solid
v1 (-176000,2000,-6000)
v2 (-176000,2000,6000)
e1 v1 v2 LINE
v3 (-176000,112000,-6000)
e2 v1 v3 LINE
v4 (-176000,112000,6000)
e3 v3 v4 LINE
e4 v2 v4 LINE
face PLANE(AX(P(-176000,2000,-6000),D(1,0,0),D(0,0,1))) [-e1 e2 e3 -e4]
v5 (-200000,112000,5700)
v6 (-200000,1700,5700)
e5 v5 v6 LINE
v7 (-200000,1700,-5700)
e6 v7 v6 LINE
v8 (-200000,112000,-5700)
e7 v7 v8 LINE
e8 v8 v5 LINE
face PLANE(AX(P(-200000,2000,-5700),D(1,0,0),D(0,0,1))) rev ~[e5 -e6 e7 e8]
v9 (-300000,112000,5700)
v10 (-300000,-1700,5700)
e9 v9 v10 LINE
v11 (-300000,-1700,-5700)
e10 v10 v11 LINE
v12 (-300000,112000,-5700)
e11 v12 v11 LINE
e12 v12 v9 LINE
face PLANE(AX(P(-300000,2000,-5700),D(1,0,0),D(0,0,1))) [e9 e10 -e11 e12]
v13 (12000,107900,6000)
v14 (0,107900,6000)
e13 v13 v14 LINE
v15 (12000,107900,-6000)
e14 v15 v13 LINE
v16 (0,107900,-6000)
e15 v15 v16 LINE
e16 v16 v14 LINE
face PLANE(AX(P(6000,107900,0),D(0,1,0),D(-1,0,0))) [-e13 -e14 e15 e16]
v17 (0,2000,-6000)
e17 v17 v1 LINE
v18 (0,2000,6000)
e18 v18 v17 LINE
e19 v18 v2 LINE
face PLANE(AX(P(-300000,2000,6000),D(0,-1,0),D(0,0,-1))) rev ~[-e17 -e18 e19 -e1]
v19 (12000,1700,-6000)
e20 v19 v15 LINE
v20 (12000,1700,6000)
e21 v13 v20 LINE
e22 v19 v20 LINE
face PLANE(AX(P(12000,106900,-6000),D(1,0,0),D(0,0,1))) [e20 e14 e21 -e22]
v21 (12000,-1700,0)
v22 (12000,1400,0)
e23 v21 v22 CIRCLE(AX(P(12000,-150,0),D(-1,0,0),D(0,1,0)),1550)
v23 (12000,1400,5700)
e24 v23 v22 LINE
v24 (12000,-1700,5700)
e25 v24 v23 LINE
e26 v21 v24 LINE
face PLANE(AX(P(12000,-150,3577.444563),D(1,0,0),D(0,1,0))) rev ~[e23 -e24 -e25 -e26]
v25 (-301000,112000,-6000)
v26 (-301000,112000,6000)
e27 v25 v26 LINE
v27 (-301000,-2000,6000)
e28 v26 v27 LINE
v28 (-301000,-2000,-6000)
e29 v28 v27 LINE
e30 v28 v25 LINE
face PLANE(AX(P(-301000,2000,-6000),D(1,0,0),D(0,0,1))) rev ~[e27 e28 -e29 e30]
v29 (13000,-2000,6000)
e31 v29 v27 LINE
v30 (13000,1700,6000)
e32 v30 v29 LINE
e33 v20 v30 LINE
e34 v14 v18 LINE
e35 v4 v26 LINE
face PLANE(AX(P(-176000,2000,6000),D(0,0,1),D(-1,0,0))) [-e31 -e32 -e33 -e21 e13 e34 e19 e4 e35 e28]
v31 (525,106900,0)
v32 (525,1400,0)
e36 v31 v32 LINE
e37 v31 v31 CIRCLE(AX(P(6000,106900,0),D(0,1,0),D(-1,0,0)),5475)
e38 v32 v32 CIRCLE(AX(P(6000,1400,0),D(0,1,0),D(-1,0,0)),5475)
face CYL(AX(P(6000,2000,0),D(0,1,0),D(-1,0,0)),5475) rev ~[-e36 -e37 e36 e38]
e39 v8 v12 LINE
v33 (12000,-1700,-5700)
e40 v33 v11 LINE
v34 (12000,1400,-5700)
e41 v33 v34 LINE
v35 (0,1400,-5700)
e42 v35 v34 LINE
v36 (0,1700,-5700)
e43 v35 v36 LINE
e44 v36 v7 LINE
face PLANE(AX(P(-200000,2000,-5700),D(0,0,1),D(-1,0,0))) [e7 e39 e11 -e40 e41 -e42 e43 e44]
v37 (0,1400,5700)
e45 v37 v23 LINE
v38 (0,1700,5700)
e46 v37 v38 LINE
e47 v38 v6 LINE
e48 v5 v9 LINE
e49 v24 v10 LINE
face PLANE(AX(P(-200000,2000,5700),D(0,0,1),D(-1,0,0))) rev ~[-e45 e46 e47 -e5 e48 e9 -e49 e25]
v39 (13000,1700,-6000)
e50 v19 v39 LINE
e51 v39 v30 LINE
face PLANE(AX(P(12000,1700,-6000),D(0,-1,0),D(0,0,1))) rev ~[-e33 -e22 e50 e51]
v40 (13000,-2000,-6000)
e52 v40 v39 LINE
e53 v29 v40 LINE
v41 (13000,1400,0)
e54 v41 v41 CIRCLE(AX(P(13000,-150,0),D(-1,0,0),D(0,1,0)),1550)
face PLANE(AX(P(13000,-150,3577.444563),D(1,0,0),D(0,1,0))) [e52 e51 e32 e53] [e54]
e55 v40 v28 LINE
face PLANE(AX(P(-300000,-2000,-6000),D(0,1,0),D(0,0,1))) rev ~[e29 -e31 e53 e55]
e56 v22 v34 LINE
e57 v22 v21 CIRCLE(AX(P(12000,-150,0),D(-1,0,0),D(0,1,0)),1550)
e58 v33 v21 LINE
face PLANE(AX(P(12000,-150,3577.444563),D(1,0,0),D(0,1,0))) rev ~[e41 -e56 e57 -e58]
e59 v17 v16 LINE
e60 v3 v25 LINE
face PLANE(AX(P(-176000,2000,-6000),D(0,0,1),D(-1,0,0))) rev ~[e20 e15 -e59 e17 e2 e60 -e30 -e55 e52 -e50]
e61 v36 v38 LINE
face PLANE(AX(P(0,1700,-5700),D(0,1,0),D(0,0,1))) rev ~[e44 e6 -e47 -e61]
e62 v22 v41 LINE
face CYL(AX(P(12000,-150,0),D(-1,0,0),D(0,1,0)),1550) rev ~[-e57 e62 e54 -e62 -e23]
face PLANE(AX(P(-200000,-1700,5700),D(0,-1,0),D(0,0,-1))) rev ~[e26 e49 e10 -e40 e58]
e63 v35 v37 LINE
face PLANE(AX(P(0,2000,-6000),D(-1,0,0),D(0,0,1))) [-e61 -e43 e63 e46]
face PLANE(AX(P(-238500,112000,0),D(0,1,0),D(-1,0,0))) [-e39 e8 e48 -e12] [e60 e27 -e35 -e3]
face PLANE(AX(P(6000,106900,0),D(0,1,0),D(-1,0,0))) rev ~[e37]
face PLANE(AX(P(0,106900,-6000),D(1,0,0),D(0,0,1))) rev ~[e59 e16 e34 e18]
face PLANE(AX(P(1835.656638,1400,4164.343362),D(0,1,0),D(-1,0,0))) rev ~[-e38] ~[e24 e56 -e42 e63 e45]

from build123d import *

# Parameters (mm, degrees)
F1_W      = 4000
F1_H      = 12000
F1_W_2    = 3400
F1_H_2    = 11400
F2_DEPTH  = 200000
F3_R      = 5475
F4_DEPTH  = 600
F5_DEPTH  = 105500
F6_DEPTH  = 12000
F8_DEPTH  = 1000
F12_W     = 12000
F12_H     = 12000
F12_R     = 5475
F13_DEPTH = 1000
F15_DEPTH = 100000
F16_W     = 3400
F16_H     = 11400
F17_DEPTH = 1000
F18_DEPTH = 300
F19_W     = 125000
F19_H     = 12000
F19_W_2   = 100000
F19_H_2   = 11400
F20_DEPTH = 110000


# Not quite as in the source:
# - the program builds the solid bodies; features that only make, move or delete a surface that nothing else refers to are left out


with BuildPart() as f2:
    # F1 (on face) → F2 (new body)
    with BuildSketch(Plane.YZ):
        Rectangle(F1_W, F1_H)
        Rectangle(F1_W_2, F1_H_2, mode=Mode.SUBTRACT)
    extrude(amount=-F2_DEPTH)

    # F3 (on face) → F4 (join)
    with BuildSketch(Plane(origin=(0, 2000, 0), x_dir=(-1, 0, 0), z_dir=(0, 1, 0))):
        with BuildLine():
            ThreePointArc((-6000, 6000), (-1757.3593128807, 4242.6406871193), (0, 0))
            Line((0, 0), (0, 6000))
            Line((0, 6000), (-6000, 6000))
        make_face()
        with BuildLine():
            ThreePointArc((-12000, 0), (-10242.6406871193, 4242.6406871193), (-6000, 6000))
            Line((-6000, 6000), (-12000, 6000))
            Line((-12000, 6000), (-12000, 0))
        make_face()
        with BuildLine():
            Line((-12000, -6000), (-6000, -6000))
            ThreePointArc((-6000, -6000), (-10242.6406871193, -4242.6406871193), (-12000, 0))
            Line((-12000, 0), (-12000, -6000))
        make_face()
        with BuildLine():
            Line((0, -6000), (0, 0))
            ThreePointArc((0, 0), (-1757.3593128807, -4242.6406871193), (-6000, -6000))
            Line((-6000, -6000), (0, -6000))
        make_face()
        with BuildLine():
            ThreePointArc((-6000, -6000), (-1757.3593128807, -4242.6406871193), (0, 0))
            ThreePointArc((0, 0), (-1757.3593128807, 4242.6406871193), (-6000, 6000))
            ThreePointArc((-6000, 6000), (-10242.6406871193, 4242.6406871193), (-12000, 0))
            ThreePointArc((-12000, 0), (-10242.6406871193, -4242.6406871193), (-6000, -6000))
        make_face()
        with Locations((-6000, 0)):
            Circle(F3_R, mode=Mode.SUBTRACT)
    extrude(amount=-F4_DEPTH)

    # F5 (add): a face of the model
    f5_faces = [f2.faces().sort_by_distance(p)[0] for p in [
        (6000, 1400, 5830.2943725152),
    ]]
    extrude(f5_faces, amount=-F5_DEPTH)

    # F6 (add): a face of the model
    f6_faces = [f2.faces().sort_by_distance(p)[0] for p in [
        (0, -300, -5875.2763053786),
    ]]
    extrude(f6_faces, amount=F6_DEPTH)

    # F7 (on face) → F8 (join)
    with BuildSketch(Plane.YZ.offset(12000)):
        with BuildLine():
            ThreePointArc((1400, 1009.9504938361), (1623.4147850968, 526.7826876426), (1700, 0))
            Line((1700, 0), (1700, 6000))
            Line((1700, 6000), (-2000, 6000))
            Line((-2000, 6000), (-2000, 0))
            ThreePointArc((-2000, 0), (-1923.4147850968, 526.7826876426), (-1700, 1009.9504938361))
            Line((-1700, 1009.9504938361), (-1700, 5700))
            Line((-1700, 5700), (1400, 5700))
            Line((1400, 5700), (1400, 1009.9504938361))
        make_face()
        with BuildLine():
            ThreePointArc((-1700, 1009.9504938361), (-150, 1850), (1400, 1009.9504938361))
            Line((1400, 1009.9504938361), (1400, 5700))
            Line((1400, 5700), (-1700, 5700))
            Line((-1700, 5700), (-1700, 1009.9504938361))
        make_face()
        with BuildLine():
            Line((1400, -5700), (1400, -1009.9504938361))
            ThreePointArc((1400, -1009.9504938361), (-150, -1850), (-1700, -1009.9504938361))
            Line((-1700, -1009.9504938361), (-1700, -5700))
            Line((-1700, -5700), (1400, -5700))
        make_face()
        with BuildLine():
            Line((1700, -6000), (1700, 0))
            ThreePointArc((1700, 0), (1623.4147850968, -526.7826876426), (1400, -1009.9504938361))
            Line((1400, -1009.9504938361), (1400, -5700))
            Line((1400, -5700), (-1700, -5700))
            Line((-1700, -5700), (-1700, -1009.9504938361))
            ThreePointArc((-1700, -1009.9504938361), (-1923.4147850968, -526.7826876426), (-2000, 0))
            Line((-2000, 0), (-2000, -6000))
            Line((-2000, -6000), (1700, -6000))
        make_face()
        with BuildLine():
            ThreePointArc((1400, -1009.9504938361), (1623.4147850968, -526.7826876426), (1700, 0))
            ThreePointArc((1700, 0), (1623.4147850968, 526.7826876426), (1400, 1009.9504938361))
            Line((1400, 1009.9504938361), (1400, 0))
            Line((1400, 0), (1400, -1009.9504938361))
        make_face()
        with BuildLine():
            Line((-1700, -3.9425e-06), (-1700, 1009.9504938361))
            ThreePointArc((-1700, 1009.9504938361), (-1923.4147850968, 526.7826876426), (-2000, 0))
            ThreePointArc((-2000, 0), (-1923.4147850968, -526.7826876426), (-1700, -1009.9504938361))
            Line((-1700, -1009.9504938361), (-1700, -3.9425e-06))
        make_face()
        with BuildLine():
            Line((1400, 0), (1400, 1009.9504938361))
            ThreePointArc((1400, 1009.9504938361), (-150, 1850), (-1700, 1009.9504938361))
            Line((-1700, 1009.9504938361), (-1700, -3.9425e-06))
            ThreePointArc((-1700, -3.9425e-06), (-150.0000019713, 1550), (1400, 0))
        make_face()
        with BuildLine():
            ThreePointArc((-1700, -1009.9504938361), (-150, -1850), (1400, -1009.9504938361))
            Line((1400, -1009.9504938361), (1400, 0))
            ThreePointArc((1400, 0), (-149.9999980287, -1550), (-1700, -3.9425e-06))
            Line((-1700, -3.9425e-06), (-1700, -1009.9504938361))
        make_face()
    extrude(amount=F8_DEPTH)

    # F12 (on face) → F13 (join)
    with BuildSketch(Plane(origin=(0, 106900, 0), x_dir=(-1, 0, 0), z_dir=(0, 1, 0))):
        with Locations((-6000, 0)):
            Rectangle(F12_W, F12_H)
        with Locations((-6000, 0)):
            Circle(F12_R, mode=Mode.SUBTRACT)
        with Locations((-6000, 0)):
            Circle(F12_R)
    extrude(amount=F13_DEPTH)

    # F14 (on face) → F15 (join)
    with BuildSketch(Plane(origin=(-200000, 0, 0), x_dir=(0, -1, 0), z_dir=(-1, 0, 0))):
        Polygon((-1700, 6000), (-1700, 5700), (1700, 5700), (1700, -5700), (-1700, -5700), (-1700, -6000), (2000, -6000), (2000, 6000), align=None)
    extrude(amount=F15_DEPTH)

    # F16 (on face) → F17 (join)
    with BuildSketch(Plane(origin=(-300000, 0, 0), x_dir=(0, -1, 0), z_dir=(-1, 0, 0))):
        Polygon((-1700, -5700), (-1700, -6000), (2000, -6000), (2000, 6000), (-1700, 6000), (-1700, 5700), (1700, 5700), (1700, -5700), align=None)
        Rectangle(F16_W, F16_H)
    extrude(amount=F17_DEPTH)

    # F18 (add): a face of the model
    f18_faces = [f2.faces().sort_by_distance(p)[0] for p in [
        (-250000, 1700, -5801.710373119),
    ]]
    extrude(f18_faces, amount=F18_DEPTH)

    # F19 (on face) → F20 (join)
    with BuildSketch(Plane(origin=(0, 2000, 0), x_dir=(-1, 0, 0), z_dir=(0, 1, 0))):
        with Locations((238500, 0)):
            Rectangle(F19_W, F19_H)
        with Locations((250000, 0)):
            Rectangle(F19_W_2, F19_H_2, mode=Mode.SUBTRACT)
    extrude(amount=F20_DEPTH)


solid = f2.part
